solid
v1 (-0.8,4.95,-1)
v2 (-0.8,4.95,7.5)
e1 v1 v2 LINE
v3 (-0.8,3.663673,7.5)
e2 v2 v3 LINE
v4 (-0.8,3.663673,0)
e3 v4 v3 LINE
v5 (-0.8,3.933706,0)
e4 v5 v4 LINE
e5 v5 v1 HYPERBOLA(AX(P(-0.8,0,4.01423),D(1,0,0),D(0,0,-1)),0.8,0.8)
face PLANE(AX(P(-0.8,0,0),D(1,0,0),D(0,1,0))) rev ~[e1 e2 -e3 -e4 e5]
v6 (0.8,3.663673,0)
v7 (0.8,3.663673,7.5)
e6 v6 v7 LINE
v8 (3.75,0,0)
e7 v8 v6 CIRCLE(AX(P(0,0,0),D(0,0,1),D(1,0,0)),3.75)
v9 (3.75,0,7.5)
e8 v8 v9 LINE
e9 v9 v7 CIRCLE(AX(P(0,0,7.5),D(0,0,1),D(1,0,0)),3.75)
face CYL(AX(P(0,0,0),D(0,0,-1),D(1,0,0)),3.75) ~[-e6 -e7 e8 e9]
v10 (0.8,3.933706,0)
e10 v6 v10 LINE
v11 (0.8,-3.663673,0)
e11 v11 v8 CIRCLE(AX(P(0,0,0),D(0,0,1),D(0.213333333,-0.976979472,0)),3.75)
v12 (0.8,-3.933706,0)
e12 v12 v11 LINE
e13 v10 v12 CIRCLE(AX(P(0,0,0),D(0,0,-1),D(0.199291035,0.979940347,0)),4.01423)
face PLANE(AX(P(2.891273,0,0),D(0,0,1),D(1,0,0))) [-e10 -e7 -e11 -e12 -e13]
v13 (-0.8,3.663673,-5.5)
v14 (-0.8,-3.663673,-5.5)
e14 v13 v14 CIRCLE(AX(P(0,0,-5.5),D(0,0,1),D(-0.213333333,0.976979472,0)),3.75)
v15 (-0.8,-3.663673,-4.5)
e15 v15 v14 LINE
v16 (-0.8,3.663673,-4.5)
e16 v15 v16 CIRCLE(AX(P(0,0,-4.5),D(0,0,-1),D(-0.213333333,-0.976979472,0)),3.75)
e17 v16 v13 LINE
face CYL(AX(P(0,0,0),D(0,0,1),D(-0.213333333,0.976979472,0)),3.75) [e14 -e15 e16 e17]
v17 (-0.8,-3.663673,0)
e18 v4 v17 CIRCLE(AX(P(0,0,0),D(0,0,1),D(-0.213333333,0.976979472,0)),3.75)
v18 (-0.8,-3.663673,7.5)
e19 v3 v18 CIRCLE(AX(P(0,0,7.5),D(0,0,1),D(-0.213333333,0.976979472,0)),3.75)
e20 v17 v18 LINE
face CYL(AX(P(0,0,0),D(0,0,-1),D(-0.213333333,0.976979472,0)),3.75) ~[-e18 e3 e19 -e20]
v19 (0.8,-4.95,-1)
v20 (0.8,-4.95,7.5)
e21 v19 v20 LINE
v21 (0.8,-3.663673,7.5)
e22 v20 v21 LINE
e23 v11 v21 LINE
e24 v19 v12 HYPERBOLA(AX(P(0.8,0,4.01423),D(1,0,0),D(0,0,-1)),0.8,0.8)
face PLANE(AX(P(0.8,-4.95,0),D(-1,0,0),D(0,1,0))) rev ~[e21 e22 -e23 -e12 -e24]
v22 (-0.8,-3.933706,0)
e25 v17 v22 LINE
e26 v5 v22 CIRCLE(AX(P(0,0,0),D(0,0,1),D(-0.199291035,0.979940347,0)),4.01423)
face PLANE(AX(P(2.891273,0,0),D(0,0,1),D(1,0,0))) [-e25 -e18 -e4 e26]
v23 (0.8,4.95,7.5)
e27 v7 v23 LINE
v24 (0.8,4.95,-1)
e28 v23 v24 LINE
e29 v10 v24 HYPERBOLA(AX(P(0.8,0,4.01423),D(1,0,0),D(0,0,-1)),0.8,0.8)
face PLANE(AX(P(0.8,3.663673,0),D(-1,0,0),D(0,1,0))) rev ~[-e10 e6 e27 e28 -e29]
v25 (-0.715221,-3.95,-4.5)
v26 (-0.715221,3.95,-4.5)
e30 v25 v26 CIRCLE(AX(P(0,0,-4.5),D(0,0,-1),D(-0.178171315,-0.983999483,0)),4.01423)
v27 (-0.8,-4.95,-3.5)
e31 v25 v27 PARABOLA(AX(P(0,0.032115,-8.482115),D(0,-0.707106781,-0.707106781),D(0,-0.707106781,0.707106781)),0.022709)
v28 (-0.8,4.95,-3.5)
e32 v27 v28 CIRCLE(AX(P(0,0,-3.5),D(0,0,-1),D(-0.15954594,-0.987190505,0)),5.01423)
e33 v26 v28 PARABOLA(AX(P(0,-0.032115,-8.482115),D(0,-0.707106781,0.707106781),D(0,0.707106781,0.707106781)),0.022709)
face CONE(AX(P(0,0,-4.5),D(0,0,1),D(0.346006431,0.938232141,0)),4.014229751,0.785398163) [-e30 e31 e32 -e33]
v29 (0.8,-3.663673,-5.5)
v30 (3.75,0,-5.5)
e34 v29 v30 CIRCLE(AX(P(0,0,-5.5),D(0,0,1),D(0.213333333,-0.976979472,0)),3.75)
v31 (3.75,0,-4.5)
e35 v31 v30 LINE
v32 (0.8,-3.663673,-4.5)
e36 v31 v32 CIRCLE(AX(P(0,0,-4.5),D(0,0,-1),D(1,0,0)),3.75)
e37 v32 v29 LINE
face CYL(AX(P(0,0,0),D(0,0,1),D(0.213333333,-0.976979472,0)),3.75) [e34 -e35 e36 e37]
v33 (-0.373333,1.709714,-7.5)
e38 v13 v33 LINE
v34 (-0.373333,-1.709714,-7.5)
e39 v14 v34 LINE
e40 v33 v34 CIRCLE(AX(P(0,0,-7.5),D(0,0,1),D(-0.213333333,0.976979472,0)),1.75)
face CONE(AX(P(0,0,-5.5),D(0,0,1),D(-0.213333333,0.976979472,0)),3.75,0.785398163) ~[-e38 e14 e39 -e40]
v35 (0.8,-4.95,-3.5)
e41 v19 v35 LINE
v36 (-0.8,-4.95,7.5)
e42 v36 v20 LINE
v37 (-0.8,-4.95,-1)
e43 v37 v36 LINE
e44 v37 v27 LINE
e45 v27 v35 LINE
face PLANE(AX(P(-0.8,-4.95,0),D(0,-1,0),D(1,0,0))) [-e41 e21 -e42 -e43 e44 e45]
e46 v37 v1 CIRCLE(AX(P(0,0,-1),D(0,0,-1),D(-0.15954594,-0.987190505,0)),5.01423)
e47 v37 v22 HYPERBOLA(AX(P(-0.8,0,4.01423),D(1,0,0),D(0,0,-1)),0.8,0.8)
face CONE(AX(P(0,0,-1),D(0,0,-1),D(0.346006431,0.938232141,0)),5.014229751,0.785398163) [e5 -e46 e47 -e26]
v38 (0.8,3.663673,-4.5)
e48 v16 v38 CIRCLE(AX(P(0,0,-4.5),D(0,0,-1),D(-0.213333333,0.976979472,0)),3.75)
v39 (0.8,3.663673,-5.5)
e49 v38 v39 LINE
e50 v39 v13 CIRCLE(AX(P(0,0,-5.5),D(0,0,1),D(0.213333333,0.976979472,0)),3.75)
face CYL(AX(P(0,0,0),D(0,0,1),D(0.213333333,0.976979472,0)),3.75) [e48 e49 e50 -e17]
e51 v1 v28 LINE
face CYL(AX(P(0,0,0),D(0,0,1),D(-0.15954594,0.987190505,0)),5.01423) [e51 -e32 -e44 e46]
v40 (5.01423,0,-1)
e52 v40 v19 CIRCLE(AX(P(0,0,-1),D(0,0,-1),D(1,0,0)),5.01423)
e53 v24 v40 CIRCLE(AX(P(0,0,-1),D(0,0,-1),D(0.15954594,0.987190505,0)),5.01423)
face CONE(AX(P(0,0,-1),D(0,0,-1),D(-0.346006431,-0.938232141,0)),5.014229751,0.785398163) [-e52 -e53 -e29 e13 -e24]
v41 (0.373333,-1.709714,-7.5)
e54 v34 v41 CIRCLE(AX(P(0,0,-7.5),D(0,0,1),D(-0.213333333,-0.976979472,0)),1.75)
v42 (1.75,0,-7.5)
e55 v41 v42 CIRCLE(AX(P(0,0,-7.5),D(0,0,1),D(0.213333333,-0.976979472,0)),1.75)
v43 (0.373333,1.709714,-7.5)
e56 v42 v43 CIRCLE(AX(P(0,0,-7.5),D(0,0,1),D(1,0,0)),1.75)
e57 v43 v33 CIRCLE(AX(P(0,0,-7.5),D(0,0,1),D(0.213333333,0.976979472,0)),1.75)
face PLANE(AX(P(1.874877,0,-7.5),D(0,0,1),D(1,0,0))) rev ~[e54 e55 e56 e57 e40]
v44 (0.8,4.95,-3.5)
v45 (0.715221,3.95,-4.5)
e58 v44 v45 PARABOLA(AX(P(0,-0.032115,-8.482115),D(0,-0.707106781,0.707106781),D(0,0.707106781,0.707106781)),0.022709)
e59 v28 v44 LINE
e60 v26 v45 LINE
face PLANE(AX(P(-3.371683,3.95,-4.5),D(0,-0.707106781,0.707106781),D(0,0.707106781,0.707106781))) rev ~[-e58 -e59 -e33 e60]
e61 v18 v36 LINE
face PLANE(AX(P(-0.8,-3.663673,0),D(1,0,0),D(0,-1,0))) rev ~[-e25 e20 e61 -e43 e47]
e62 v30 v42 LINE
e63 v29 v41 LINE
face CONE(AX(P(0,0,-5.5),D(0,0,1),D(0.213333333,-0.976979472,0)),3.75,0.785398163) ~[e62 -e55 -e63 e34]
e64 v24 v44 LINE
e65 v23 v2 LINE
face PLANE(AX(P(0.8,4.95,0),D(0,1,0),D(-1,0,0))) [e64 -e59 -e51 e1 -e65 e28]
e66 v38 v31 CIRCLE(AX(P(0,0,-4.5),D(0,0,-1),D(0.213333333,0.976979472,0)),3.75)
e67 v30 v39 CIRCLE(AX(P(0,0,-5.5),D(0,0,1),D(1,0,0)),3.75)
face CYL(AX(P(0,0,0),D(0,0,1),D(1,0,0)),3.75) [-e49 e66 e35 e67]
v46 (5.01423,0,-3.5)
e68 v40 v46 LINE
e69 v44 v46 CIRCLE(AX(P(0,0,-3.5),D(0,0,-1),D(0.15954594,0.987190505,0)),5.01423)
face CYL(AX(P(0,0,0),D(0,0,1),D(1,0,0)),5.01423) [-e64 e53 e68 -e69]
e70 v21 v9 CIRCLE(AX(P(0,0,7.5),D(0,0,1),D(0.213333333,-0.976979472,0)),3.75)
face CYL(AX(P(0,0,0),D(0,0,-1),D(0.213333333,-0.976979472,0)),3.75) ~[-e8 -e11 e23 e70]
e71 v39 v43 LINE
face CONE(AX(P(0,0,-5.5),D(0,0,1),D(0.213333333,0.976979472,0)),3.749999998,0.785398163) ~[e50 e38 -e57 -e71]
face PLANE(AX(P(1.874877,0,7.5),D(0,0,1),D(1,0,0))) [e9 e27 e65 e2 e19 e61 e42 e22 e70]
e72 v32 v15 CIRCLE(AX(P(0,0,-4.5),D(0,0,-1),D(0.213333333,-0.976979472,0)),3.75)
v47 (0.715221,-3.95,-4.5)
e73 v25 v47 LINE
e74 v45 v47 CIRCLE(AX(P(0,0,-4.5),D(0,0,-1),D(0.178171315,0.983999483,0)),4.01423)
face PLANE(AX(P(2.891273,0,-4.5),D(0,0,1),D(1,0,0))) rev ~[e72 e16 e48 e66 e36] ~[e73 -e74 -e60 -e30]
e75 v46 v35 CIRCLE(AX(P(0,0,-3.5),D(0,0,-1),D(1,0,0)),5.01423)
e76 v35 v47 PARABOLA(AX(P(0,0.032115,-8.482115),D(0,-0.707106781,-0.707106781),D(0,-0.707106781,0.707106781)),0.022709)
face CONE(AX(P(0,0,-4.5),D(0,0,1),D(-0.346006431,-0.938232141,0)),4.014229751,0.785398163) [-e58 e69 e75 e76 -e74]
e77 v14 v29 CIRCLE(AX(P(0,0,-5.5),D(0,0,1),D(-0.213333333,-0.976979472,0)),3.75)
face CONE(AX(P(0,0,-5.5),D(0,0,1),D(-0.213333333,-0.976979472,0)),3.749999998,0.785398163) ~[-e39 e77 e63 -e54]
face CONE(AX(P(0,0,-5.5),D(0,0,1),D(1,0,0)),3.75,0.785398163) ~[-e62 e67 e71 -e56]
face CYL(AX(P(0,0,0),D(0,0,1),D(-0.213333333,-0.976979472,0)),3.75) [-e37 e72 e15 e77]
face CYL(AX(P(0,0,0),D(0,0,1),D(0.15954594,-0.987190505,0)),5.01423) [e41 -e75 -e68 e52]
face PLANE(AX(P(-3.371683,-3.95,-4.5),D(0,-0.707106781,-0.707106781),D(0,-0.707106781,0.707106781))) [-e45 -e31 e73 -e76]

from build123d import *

# Parameters (mm, degrees)
F1_DEPTH     = 7.5
F2_DEPTH     = 7.5
F3_DEPTH     = 4.5
F4_SIZE      = 2
F5_T1_DEPTH  = 6.7433659759
F5_T4_ANGLE  = 220.4864882976
F5_T6_ANGLE  = 220.4864882976
F5_T10_ANGLE = 220.4864882976
F5_T15_ANGLE = 220.4864882976
F5_T20_ANGLE = 220.4864882976
F5_T25_ANGLE = 220.4864882976


# Not quite as in the source:
# - a fillet or chamfer that OpenCascade refuses, or shapes differently, is made with other operations: its cross-section is extruded or revolved along the edge and cut away or added


with BuildPart() as f1:
    # F0 (on Top) → F1 (new body)
    with BuildSketch(Plane.XY):
        with BuildLine():
            ThreePointArc((0.8, -3.6636730203), (2.9208303614, -2.3518609653), (3.75, 0))
            ThreePointArc((3.75, 0), (2.9208303614, 2.3518609653), (0.8, 3.6636730203))
            Line((0.8, 3.6636730203), (0.8, -3.6636730203))
        make_face()
        with BuildLine():
            Line((0.8, -3.6636730203), (0.8, 3.6636730203))
            ThreePointArc((0.8, 3.6636730203), (0, 3.75), (-0.8, 3.6636730203))
            Line((-0.8, 3.6636730203), (-0.8, -3.6636730203))
            ThreePointArc((-0.8, -3.6636730203), (0, -3.75), (0.8, -3.6636730203))
        make_face()
        with BuildLine():
            Line((-0.8, -3.6636730203), (-0.8, 3.6636730203))
            ThreePointArc((-0.8, 3.6636730203), (-3.75, 0), (-0.8, -3.6636730203))
        make_face()
    extrude(amount=-F1_DEPTH)

    # F0 (on Top) → F2 (join)
    with BuildSketch(Plane.XY):
        with BuildLine():
            ThreePointArc((0.8, -3.6636730203), (2.9208303614, -2.3518609653), (3.75, 0))
            ThreePointArc((3.75, 0), (2.9208303614, 2.3518609653), (0.8, 3.6636730203))
            Line((0.8, 3.6636730203), (0.8, -3.6636730203))
        make_face()
        with BuildLine():
            Line((0.8, -3.6636730203), (0.8, 3.6636730203))
            ThreePointArc((0.8, 3.6636730203), (0, 3.75), (-0.8, 3.6636730203))
            Line((-0.8, 3.6636730203), (-0.8, -3.6636730203))
            ThreePointArc((-0.8, -3.6636730203), (0, -3.75), (0.8, -3.6636730203))
        make_face()
        with BuildLine():
            Line((-0.8, -3.6636730203), (-0.8, 3.6636730203))
            ThreePointArc((-0.8, 3.6636730203), (-3.75, 0), (-0.8, -3.6636730203))
        make_face()
        with BuildLine():
            ThreePointArc((-0.8, 3.6636730203), (0, 3.75), (0.8, 3.6636730203))
            Line((0.8, 3.6636730203), (0.8, 4.95))
            Line((0.8, 4.95), (-0.8, 4.95))
            Line((-0.8, 4.95), (-0.8, 3.6636730203))
        make_face()
        with BuildLine():
            Line((0.8, -4.95), (0.8, -3.6636730203))
            ThreePointArc((0.8, -3.6636730203), (0, -3.75), (-0.8, -3.6636730203))
            Line((-0.8, -3.6636730203), (-0.8, -4.95))
            Line((-0.8, -4.95), (0.8, -4.95))
        make_face()
    extrude(amount=F2_DEPTH)

    # F0 (on Top) → F3 (join)
    with BuildSketch(Plane.XY):
        with BuildLine():
            ThreePointArc((0.8, 3.6636730203), (2.9208303614, 2.3518609653), (3.75, 0))
            ThreePointArc((3.75, 0), (2.9208303614, -2.3518609653), (0.8, -3.6636730203))
            Line((0.8, -3.6636730203), (0.8, -4.95))
            ThreePointArc((0.8, -4.95), (3.8179761524, -3.2504704428), (5.0142297514, 0))
            ThreePointArc((5.0142297514, 0), (3.8179761524, 3.2504704428), (0.8, 4.95))
            Line((0.8, 4.95), (0.8, 3.6636730203))
        make_face()
        with BuildLine():
            Line((0.8, -4.95), (0.8, -3.6636730203))
            ThreePointArc((0.8, -3.6636730203), (0, -3.75), (-0.8, -3.6636730203))
            Line((-0.8, -3.6636730203), (-0.8, -4.95))
            Line((-0.8, -4.95), (0.8, -4.95))
        make_face()
        with BuildLine():
            ThreePointArc((-0.8, -3.6636730203), (-3.75, 0), (-0.8, 3.6636730203))
            Line((-0.8, 3.6636730203), (-0.8, 4.95))
            ThreePointArc((-0.8, 4.95), (-5.0142297514, 0), (-0.8, -4.95))
            Line((-0.8, -4.95), (-0.8, -3.6636730203))
        make_face()
        with BuildLine():
            ThreePointArc((-0.8, 3.6636730203), (0, 3.75), (0.8, 3.6636730203))
            Line((0.8, 3.6636730203), (0.8, 4.95))
            Line((0.8, 4.95), (-0.8, 4.95))
            Line((-0.8, 4.95), (-0.8, 3.6636730203))
        make_face()
    extrude(amount=-F3_DEPTH)

    # F4
    f4_edges = [f1.edges().sort_by_distance(p)[0] for p in [
        (0.8, -3.663673, -7.5),
    ]]
    chamfer(f4_edges, length=F4_SIZE)

    # F5: chamfer of 1 on 6 edges, made by hand

    # F5_s2 → F5_t1 (cut)
    with BuildSketch(Plane.YZ.offset(-3.371682988)):
        Polygon((-3.95, -4.5), (-4.95, -3.5), (-4.95, -4.5), align=None)
        Polygon((3.95, -4.5), (4.95, -3.5), (4.95, -4.5), align=None)
    extrude(amount=F5_T1_DEPTH, mode=Mode.SUBTRACT)

    # F5_s3 → F5_t4 (revolve, cut)
    with BuildSketch(Plane(origin=(0, 0, 0), x_dir=(0, 0, 1), z_dir=(0.9382321407, -0.3460064308, 0))):
        Polygon((-4.5, -4.0142297514), (-3.5, -5.0142297514), (-4.5, -5.0142297514), align=None)
    revolve(axis=Axis((0, 0, -4.5), (0, 0, 1)), revolution_arc=F5_T4_ANGLE, mode=Mode.SUBTRACT)

    # F5_s5 → F5_t6 (revolve, cut)
    with BuildSketch(Plane(origin=(0, 0, 0), x_dir=(0, 0, 1), z_dir=(-0.9382321407, 0.3460064308, 0))):
        Polygon((-4.5, -4.0142297514), (-3.5, -5.0142297514), (-4.5, -5.0142297514), align=None)
    revolve(axis=Axis((0, 0, -4.5), (0, 0, 1)), revolution_arc=F5_T6_ANGLE, mode=Mode.SUBTRACT)


with BuildPart() as f5_tool8:
    # F5_s9 → F5_t10 (revolve)
    with BuildSketch(Plane(origin=(0, 0, 0), x_dir=(0, 0, 1), z_dir=(0.9382321407, -0.3460064308, 0))):
        Polygon((-1, -5.0142297514), (0, -4.0142297514), (0, -5.0142297514), align=None)
    revolve(axis=Axis((0, 0, 0), (0, 0, 1)), revolution_arc=F5_T10_ANGLE)

    split(bisect_by=Plane.YZ.offset(0.8), keep=Keep.TOP)


with BuildPart() as f1_1:
    add(f1.part)

    # F5_t7: cut F5_tool8
    add(f5_tool8.part, mode=Mode.SUBTRACT)


with BuildPart() as f5_tool13:
    # F5_s14 → F5_t15 (revolve)
    with BuildSketch(Plane(origin=(0, 0, 0), x_dir=(0, 0, 1), z_dir=(0.9382321407, -0.3460064308, 0))):
        Polygon((-1, -5.0142297514), (0, -4.0142297514), (0, -5.0142297514), align=None)
    revolve(axis=Axis((0, 0, 0), (0, 0, 1)), revolution_arc=F5_T15_ANGLE)

    split(bisect_by=Plane.YZ.offset(-0.8), keep=Keep.BOTTOM)


with BuildPart() as f1_2:
    add(f1_1.part)

    # F5_t12: cut F5_tool13
    add(f5_tool13.part, mode=Mode.SUBTRACT)


with BuildPart() as f5_tool18:
    # F5_s19 → F5_t20 (revolve)
    with BuildSketch(Plane(origin=(0, 0, 0), x_dir=(0, 0, 1), z_dir=(-0.9382321407, 0.3460064308, 0))):
        Polygon((-1, -5.0142297514), (0, -4.0142297514), (0, -5.0142297514), align=None)
    revolve(axis=Axis((0, 0, 0), (0, 0, 1)), revolution_arc=F5_T20_ANGLE)

    split(bisect_by=Plane.YZ.offset(-0.8), keep=Keep.BOTTOM)


with BuildPart() as f1_3:
    add(f1_2.part)

    # F5_t17: cut F5_tool18
    add(f5_tool18.part, mode=Mode.SUBTRACT)


with BuildPart() as f5_tool23:
    # F5_s24 → F5_t25 (revolve)
    with BuildSketch(Plane(origin=(0, 0, 0), x_dir=(0, 0, 1), z_dir=(-0.9382321407, 0.3460064308, 0))):
        Polygon((-1, -5.0142297514), (0, -4.0142297514), (0, -5.0142297514), align=None)
    revolve(axis=Axis((0, 0, 0), (0, 0, 1)), revolution_arc=F5_T25_ANGLE)

    split(bisect_by=Plane.YZ.offset(0.8), keep=Keep.TOP)


with BuildPart() as f1_4:
    add(f1_3.part)

    # F5_t22: cut F5_tool23
    add(f5_tool23.part, mode=Mode.SUBTRACT)


solid = f1_4.part
